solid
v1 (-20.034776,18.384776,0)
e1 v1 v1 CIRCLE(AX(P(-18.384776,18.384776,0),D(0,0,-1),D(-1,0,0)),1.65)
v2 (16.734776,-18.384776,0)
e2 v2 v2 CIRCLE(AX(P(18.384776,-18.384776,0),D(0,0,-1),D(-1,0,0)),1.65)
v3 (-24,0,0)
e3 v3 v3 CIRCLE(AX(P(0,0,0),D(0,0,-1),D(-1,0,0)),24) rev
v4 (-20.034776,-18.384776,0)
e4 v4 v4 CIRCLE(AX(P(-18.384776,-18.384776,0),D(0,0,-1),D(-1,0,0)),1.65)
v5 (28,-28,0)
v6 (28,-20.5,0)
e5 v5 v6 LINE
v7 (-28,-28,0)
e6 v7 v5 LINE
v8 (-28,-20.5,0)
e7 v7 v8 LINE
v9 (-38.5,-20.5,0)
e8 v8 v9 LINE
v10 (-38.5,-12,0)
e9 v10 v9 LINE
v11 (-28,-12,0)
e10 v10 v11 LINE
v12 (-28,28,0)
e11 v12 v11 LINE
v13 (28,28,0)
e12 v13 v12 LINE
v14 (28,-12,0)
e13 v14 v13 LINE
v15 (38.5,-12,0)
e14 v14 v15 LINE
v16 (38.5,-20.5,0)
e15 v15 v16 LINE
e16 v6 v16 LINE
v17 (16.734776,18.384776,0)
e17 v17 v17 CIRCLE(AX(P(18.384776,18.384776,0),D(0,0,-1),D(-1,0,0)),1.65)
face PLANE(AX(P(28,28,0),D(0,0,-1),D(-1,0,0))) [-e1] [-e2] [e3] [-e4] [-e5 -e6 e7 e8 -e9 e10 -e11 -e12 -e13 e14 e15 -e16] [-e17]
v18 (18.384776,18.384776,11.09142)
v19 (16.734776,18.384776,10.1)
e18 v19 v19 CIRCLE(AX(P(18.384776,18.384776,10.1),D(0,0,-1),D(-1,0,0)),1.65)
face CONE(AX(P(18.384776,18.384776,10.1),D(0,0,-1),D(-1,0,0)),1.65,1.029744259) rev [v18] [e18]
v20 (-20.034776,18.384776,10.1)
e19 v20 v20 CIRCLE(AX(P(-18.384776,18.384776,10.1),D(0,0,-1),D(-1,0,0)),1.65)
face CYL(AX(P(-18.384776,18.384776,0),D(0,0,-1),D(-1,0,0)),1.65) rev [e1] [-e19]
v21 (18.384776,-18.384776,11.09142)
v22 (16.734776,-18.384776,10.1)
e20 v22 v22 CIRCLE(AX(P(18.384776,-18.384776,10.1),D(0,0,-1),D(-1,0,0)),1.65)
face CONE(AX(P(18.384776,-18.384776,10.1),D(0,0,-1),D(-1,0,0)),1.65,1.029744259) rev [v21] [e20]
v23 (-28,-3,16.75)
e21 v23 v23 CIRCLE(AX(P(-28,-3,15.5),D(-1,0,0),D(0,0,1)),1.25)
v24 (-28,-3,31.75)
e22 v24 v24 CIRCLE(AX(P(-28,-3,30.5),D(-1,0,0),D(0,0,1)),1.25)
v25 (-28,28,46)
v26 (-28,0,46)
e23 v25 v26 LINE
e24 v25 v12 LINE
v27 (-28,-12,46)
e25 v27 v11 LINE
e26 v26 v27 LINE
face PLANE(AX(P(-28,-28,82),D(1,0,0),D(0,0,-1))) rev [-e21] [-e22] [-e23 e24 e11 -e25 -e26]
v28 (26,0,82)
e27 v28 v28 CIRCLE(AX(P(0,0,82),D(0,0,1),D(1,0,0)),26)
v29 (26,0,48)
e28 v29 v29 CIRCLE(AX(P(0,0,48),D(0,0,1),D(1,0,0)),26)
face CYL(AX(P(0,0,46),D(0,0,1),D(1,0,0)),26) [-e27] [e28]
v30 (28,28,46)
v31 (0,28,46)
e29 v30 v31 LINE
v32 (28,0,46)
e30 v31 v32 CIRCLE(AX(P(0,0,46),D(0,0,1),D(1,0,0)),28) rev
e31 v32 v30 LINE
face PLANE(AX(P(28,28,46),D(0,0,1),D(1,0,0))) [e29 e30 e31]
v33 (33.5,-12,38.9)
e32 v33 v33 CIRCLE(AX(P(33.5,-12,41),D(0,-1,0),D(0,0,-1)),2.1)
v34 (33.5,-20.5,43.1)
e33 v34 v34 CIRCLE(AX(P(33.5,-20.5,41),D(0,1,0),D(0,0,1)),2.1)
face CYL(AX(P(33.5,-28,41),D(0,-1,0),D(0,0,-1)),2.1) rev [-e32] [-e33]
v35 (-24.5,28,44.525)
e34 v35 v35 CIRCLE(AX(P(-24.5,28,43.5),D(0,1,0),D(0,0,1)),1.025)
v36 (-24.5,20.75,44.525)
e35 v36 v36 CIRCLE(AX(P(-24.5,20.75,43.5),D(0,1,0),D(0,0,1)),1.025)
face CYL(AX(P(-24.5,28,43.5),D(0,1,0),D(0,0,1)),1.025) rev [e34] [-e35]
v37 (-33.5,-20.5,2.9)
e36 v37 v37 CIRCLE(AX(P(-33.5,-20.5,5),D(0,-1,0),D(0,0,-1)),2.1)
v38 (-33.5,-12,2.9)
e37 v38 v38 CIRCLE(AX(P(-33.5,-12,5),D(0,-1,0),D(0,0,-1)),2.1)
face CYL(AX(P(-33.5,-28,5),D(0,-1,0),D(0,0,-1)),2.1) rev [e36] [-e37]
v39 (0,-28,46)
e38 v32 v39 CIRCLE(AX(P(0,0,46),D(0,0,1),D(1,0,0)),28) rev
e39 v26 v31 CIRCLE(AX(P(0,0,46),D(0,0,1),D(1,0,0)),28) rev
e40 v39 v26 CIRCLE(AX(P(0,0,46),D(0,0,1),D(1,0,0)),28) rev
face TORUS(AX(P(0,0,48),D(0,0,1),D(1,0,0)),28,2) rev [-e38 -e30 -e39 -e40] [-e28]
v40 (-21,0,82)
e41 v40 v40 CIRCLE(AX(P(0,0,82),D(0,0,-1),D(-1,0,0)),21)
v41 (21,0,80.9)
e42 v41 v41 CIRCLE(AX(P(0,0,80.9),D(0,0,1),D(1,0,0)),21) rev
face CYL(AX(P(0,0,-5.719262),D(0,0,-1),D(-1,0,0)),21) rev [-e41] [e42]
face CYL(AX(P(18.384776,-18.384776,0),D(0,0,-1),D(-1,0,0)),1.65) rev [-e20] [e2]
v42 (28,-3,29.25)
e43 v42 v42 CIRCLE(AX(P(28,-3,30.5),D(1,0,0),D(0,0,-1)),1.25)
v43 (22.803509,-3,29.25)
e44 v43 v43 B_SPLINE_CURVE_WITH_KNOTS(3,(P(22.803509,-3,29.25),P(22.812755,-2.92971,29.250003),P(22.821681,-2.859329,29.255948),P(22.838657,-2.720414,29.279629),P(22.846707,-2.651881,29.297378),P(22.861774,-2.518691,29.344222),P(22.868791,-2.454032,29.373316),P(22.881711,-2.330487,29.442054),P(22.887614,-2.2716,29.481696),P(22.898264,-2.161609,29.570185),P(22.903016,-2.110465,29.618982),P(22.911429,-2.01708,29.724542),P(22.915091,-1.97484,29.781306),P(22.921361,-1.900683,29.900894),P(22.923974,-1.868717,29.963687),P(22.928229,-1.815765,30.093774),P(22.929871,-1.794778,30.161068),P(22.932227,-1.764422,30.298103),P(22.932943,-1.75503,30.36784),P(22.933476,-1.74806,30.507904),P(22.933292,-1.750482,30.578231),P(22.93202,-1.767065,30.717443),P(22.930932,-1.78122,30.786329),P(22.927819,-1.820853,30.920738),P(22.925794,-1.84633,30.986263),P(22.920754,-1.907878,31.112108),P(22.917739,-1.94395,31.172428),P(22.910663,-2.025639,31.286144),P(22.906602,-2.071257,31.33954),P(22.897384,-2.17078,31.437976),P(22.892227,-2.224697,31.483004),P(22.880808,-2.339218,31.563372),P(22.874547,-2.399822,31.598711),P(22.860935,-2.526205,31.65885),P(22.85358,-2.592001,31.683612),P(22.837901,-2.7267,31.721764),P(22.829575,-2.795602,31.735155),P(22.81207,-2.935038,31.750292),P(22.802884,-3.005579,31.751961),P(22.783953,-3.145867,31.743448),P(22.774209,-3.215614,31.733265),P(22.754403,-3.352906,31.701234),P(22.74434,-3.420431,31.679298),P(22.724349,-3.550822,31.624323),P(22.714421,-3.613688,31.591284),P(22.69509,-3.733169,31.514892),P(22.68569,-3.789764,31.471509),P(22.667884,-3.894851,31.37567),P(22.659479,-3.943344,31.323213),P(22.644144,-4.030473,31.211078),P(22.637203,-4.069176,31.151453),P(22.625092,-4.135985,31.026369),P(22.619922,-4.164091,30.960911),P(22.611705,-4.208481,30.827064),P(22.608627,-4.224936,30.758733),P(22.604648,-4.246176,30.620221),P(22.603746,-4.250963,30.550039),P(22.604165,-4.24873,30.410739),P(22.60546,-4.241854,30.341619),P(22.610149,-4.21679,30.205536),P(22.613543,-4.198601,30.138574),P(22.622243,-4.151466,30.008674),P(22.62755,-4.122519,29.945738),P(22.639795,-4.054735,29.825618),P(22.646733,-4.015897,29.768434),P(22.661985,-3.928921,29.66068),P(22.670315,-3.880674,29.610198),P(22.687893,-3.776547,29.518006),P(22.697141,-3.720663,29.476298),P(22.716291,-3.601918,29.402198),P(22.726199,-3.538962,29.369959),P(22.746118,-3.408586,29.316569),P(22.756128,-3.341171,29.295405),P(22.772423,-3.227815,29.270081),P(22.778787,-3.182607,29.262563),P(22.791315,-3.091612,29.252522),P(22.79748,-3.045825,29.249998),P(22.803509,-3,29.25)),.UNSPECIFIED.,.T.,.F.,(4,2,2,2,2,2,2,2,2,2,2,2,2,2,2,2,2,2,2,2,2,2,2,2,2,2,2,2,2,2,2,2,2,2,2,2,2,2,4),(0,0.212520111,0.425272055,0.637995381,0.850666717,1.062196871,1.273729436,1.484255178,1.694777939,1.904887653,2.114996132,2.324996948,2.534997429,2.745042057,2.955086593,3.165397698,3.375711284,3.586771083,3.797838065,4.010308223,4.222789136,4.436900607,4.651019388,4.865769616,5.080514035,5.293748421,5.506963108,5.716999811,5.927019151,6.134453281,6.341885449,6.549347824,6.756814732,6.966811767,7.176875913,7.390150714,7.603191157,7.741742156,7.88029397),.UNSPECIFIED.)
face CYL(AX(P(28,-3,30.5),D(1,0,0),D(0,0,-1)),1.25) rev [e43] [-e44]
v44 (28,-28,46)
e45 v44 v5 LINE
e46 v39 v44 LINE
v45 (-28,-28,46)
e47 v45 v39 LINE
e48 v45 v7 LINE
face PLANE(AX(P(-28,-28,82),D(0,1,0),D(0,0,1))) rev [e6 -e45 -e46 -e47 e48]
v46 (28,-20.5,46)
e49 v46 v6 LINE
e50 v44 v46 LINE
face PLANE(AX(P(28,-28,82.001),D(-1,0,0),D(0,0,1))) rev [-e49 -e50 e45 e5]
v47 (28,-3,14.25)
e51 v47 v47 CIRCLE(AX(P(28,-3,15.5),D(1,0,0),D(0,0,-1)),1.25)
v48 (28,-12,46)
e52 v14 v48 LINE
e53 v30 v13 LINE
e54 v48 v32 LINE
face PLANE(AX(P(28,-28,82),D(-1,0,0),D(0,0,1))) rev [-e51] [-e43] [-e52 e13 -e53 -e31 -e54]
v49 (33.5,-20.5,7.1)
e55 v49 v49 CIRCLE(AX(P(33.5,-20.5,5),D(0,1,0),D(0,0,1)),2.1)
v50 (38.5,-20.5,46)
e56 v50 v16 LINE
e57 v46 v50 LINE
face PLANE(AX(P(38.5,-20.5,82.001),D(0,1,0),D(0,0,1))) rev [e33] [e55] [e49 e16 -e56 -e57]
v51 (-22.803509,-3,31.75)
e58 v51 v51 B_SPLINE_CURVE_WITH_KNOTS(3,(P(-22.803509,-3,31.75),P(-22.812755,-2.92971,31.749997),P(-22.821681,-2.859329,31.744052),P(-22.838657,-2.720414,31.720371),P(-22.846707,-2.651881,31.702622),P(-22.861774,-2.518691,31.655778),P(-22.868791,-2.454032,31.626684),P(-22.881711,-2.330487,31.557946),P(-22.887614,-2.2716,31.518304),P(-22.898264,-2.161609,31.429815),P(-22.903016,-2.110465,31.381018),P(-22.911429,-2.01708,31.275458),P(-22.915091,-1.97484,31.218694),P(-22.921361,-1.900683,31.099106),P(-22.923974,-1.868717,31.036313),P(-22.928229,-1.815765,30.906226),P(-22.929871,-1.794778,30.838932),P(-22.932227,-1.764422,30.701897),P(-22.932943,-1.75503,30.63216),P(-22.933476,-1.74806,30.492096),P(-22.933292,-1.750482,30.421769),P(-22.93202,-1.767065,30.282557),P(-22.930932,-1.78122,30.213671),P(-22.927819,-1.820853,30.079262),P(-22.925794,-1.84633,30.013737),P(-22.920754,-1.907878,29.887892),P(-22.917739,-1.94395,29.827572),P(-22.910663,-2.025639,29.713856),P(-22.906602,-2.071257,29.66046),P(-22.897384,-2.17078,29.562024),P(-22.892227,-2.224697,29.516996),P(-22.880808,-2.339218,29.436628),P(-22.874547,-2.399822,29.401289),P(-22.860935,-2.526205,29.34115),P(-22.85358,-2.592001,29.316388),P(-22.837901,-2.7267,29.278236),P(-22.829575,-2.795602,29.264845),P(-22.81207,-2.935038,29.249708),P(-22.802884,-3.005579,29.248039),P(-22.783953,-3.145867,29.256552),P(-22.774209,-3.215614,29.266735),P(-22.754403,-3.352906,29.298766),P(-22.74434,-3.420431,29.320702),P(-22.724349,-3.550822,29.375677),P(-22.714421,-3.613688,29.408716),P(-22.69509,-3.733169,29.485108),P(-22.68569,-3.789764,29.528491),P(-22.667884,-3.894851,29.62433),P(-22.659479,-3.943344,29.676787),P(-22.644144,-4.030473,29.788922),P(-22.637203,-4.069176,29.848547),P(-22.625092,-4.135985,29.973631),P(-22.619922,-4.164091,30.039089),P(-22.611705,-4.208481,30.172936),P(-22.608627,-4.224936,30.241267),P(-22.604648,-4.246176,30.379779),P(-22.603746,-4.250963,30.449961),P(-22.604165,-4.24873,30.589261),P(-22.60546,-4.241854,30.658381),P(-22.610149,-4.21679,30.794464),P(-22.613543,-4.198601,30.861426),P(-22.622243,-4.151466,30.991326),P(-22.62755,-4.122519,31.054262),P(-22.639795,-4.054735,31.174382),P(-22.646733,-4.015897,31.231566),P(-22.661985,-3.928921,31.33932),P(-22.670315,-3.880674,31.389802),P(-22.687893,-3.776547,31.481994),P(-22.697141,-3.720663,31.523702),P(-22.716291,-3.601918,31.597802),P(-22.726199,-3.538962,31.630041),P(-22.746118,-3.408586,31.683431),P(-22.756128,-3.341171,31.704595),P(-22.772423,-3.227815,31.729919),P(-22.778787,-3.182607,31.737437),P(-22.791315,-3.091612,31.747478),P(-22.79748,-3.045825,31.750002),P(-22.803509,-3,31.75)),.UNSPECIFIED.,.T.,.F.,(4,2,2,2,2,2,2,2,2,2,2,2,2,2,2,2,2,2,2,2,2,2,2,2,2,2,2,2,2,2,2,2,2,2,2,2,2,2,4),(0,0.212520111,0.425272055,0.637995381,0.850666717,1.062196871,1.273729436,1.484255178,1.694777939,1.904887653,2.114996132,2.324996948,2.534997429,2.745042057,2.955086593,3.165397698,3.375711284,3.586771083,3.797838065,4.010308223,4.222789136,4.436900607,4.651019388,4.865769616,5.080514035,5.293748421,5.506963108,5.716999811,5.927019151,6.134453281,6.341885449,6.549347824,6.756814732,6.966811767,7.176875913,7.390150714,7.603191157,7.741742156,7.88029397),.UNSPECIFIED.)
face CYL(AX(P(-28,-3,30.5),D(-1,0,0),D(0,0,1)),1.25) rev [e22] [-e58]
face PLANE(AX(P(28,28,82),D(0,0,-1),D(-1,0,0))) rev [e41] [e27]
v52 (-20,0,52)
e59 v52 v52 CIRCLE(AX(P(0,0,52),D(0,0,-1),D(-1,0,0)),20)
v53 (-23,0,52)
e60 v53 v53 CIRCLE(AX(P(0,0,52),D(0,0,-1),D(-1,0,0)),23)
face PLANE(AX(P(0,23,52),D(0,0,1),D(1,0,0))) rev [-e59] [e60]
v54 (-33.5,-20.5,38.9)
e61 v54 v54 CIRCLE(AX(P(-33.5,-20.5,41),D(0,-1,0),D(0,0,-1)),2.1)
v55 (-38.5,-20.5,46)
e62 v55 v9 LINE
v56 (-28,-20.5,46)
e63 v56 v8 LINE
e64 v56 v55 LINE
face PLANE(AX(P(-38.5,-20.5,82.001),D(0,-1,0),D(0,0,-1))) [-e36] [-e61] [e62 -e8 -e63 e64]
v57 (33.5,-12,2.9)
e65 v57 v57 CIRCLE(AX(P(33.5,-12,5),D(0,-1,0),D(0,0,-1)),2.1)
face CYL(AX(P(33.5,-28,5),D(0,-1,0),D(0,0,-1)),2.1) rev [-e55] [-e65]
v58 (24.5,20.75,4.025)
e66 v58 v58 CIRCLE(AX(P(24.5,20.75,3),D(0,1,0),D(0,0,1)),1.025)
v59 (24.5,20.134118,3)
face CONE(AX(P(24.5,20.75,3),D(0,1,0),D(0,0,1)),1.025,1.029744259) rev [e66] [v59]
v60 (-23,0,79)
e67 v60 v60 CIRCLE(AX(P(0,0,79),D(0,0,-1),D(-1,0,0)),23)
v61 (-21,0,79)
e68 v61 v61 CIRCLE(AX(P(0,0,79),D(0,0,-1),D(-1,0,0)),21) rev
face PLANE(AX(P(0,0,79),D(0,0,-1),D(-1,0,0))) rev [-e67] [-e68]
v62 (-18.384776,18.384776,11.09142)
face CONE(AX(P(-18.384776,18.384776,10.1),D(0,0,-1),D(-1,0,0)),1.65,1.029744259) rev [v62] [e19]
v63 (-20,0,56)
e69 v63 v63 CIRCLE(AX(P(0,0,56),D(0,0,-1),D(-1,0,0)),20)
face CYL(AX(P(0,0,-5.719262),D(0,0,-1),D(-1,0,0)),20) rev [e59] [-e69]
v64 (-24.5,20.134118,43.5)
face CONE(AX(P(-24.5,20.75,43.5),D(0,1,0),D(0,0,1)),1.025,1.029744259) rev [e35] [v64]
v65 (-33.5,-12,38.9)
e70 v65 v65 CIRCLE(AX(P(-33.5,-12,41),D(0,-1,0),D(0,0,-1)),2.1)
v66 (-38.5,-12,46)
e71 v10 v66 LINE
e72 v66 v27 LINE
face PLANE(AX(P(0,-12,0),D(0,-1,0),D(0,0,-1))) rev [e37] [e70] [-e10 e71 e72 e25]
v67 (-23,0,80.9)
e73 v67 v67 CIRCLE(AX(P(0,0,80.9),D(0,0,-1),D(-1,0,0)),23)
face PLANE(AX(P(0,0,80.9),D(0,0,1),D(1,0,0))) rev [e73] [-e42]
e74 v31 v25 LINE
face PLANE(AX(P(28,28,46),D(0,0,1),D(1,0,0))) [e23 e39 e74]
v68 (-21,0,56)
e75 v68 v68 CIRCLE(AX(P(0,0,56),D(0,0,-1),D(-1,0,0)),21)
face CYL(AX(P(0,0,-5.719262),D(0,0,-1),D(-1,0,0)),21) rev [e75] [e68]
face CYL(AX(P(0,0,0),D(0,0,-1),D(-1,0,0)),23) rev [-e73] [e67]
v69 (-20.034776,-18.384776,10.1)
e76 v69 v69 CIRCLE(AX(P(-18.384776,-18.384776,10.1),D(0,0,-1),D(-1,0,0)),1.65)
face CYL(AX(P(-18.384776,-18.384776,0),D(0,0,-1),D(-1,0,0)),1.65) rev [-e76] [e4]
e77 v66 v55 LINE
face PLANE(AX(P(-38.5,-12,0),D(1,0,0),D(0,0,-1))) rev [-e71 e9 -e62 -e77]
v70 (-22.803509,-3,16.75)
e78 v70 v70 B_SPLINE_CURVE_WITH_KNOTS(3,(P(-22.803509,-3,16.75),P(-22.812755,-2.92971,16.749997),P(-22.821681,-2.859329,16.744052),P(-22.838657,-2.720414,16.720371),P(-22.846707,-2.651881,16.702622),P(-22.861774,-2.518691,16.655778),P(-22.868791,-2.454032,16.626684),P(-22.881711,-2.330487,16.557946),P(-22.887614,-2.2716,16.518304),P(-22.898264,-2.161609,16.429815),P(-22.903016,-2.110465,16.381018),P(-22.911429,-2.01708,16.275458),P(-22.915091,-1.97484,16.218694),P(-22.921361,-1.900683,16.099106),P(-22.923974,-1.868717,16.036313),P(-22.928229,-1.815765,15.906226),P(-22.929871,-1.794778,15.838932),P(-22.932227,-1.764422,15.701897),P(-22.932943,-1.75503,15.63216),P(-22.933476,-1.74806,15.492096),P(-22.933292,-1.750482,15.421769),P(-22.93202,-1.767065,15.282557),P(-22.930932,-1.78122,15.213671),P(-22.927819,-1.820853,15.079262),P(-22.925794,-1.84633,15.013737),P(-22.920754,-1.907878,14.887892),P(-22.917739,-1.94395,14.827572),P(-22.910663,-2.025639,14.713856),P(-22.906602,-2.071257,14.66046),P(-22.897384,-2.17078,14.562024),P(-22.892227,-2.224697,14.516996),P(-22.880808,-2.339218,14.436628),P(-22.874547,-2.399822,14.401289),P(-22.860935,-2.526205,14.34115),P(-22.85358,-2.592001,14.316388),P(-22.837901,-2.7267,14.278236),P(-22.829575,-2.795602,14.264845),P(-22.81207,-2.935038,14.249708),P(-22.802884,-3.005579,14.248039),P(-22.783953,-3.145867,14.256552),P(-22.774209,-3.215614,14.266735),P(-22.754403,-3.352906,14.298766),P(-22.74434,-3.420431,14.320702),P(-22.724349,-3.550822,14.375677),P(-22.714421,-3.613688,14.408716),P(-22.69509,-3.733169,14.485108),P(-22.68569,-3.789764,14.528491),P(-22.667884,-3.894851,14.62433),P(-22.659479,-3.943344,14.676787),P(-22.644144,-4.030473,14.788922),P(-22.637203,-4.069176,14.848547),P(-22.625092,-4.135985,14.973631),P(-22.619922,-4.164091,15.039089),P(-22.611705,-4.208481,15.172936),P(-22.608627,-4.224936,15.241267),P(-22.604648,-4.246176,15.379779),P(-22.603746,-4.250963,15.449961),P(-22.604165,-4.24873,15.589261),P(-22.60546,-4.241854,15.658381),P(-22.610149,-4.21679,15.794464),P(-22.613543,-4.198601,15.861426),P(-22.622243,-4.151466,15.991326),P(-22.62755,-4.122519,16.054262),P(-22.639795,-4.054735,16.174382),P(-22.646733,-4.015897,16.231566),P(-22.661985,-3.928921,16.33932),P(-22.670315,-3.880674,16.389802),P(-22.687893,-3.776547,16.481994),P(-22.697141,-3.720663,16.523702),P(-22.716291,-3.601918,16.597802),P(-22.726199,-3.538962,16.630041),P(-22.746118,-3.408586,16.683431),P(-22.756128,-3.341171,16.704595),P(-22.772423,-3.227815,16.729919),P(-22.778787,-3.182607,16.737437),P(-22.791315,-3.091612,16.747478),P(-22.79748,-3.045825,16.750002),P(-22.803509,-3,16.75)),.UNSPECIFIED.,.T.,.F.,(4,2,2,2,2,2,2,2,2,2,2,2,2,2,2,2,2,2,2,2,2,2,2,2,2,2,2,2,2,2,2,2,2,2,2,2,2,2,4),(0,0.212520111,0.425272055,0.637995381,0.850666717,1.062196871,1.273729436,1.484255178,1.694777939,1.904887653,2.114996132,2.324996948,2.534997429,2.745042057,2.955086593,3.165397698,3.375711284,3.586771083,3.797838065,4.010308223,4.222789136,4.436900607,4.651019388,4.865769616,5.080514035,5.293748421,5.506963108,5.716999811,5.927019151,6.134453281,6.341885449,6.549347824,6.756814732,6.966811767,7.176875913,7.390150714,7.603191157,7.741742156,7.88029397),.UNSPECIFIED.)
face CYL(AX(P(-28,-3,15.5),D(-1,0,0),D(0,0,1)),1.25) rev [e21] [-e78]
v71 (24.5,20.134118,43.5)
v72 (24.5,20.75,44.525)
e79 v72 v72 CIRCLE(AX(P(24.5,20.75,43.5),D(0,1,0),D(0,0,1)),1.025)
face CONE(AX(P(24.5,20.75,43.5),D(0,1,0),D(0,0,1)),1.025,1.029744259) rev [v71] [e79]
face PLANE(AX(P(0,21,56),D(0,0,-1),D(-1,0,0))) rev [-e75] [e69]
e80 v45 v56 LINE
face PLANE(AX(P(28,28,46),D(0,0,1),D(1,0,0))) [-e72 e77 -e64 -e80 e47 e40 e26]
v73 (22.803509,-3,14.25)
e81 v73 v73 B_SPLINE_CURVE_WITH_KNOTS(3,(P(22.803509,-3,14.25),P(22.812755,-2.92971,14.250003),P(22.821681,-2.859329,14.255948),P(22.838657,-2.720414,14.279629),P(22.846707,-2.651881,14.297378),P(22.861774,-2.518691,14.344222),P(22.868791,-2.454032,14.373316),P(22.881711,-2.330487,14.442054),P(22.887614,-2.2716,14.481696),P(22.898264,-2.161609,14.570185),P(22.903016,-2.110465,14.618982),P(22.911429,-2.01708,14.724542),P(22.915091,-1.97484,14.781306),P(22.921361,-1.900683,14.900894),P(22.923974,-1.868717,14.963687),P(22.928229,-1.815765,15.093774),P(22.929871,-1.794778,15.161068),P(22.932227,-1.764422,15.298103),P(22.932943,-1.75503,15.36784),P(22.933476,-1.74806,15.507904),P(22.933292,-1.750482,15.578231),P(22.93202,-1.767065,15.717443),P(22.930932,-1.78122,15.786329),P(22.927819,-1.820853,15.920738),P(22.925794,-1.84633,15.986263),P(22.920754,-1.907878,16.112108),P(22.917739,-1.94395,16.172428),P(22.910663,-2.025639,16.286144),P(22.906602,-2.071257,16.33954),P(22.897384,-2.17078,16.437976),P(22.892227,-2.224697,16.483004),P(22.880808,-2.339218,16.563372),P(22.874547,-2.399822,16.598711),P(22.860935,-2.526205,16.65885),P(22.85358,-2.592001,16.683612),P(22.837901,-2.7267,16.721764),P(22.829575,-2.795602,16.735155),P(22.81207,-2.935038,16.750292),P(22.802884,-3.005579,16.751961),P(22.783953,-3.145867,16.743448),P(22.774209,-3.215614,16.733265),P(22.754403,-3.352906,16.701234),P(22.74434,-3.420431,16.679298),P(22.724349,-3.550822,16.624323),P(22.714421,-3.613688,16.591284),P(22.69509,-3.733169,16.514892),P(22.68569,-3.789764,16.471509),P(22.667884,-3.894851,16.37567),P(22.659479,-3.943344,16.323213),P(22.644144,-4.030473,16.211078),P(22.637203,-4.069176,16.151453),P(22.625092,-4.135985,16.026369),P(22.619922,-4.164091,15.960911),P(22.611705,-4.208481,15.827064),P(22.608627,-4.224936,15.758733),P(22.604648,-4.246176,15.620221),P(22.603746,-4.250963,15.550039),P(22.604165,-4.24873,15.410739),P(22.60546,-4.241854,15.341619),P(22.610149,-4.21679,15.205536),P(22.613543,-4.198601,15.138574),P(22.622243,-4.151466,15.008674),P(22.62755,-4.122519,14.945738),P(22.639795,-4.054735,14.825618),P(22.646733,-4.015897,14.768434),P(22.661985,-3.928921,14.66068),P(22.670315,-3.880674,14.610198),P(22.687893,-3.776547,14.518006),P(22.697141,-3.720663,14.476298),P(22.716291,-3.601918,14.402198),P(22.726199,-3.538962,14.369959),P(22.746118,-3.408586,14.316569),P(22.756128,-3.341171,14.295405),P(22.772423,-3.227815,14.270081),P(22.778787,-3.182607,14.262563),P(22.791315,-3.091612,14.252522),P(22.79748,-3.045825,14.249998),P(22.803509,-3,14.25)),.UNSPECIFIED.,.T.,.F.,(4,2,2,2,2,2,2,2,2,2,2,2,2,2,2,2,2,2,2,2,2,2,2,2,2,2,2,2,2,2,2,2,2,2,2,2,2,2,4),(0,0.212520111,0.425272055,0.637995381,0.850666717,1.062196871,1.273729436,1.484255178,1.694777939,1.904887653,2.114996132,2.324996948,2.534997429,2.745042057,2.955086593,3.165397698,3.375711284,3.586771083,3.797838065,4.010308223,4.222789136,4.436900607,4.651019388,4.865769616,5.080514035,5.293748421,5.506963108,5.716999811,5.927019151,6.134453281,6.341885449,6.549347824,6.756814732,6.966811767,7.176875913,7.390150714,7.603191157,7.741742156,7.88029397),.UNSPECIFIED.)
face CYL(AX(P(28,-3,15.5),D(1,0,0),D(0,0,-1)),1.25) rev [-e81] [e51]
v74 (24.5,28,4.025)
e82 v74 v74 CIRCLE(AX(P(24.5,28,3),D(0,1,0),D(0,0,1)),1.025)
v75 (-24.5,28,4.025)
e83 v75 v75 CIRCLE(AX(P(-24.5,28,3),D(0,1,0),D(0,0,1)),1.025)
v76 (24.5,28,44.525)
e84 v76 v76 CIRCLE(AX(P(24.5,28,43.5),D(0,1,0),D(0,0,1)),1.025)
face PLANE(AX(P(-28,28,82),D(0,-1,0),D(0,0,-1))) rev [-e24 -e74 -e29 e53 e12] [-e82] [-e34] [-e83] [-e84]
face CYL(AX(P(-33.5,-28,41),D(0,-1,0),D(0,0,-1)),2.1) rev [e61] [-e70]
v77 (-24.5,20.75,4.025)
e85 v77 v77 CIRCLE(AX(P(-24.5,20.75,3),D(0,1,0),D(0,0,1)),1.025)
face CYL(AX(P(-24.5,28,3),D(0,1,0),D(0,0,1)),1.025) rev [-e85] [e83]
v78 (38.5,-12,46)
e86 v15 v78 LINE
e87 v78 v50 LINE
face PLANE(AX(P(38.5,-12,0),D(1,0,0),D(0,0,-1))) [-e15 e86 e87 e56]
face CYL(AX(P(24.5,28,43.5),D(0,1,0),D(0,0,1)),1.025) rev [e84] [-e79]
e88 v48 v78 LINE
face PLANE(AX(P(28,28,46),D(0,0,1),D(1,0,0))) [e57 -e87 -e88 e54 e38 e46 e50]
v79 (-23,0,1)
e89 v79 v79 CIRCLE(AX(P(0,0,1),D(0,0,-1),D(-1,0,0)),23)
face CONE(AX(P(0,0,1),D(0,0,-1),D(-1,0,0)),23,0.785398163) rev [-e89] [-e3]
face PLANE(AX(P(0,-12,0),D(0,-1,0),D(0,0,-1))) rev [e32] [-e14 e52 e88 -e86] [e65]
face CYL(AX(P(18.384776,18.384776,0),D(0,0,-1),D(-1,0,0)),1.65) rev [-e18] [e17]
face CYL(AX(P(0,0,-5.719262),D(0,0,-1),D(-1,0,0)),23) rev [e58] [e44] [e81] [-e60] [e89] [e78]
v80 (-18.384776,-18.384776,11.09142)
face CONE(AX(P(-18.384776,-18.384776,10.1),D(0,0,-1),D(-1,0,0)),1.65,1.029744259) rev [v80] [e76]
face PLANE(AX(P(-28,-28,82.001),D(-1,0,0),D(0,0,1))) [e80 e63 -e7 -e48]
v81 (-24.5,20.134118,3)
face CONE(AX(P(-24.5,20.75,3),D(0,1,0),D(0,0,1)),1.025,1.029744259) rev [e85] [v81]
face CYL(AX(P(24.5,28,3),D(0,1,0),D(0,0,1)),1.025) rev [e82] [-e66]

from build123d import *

# Parameters (mm, degrees)
SKETCH_1_W                  = 56
SKETCH_1_H                  = 56
EXTRUDE_1_DEPTH             = 82
SKETCH_4_W                  = 56
SKETCH_4_H                  = 56
SKETCH_4_R                  = 26
CUT_EXTRUDE_1_DEPTH         = 36
HOLE_WIZARD_M4_1_D          = 3.3
HOLE_WIZARD_M4_1_DEPTH      = 10.1
HOLE_WIZARD_M4_1_TIP        = 0.991420021
SKETCH_15_W                 = 23
SKETCH_15_H                 = 1.9
FILLET_1_R                  = 2
CHAMFER_2_SIZE              = 1
HOLE_WIZARD_M2_5_1_D        = 2.05
HOLE_WIZARD_M2_5_1_DEPTH    = 7.25
HOLE_WIZARD_M2_5_1_TIP      = 0.615882135
SKETCH_19_W                 = 10.5
SKETCH_19_H                 = 46
EXTRUDE_2_DEPTH             = 16
HOLE_WIZARD_M5_1_D          = 4.2
HOLE_WIZARD_M3_1_AT_2_COUNT = 2
HOLE_WIZARD_M3_1_AT_2_PITCH = 15
CUT_EXTRUDE_2_REACH         = 96.817
SKETCH_25_W                 = 10.5
SKETCH_25_H                 = 7.5


with BuildPart() as part:
    # 草图1 → 凸台-拉伸1 (new body)
    with BuildSketch(Plane.XY):
        Rectangle(SKETCH_1_W, SKETCH_1_H)
    extrude(amount=EXTRUDE_1_DEPTH)

    # 草图3 → 切除-旋转2 (revolve, cut)
    with BuildSketch(Plane(origin=(0, 0, 0), x_dir=(0, 0, -1), z_dir=(1, 0, 0)), mode=Mode.PRIVATE) as cut_revolve_2_sk:
        Polygon((-82, 0), (0, 0), (0, 23), (-52, 23), (-52, 20), (-56, 20), (-56, 21), (-82, 21), align=None)
    revolve(cut_revolve_2_sk.sketch.rotate(Axis((0, 0, -5.719261836), (0, 0, 1)), 90), axis=Axis((0, 0, -5.719261836), (0, 0, 1)), mode=Mode.SUBTRACT)

    # 草图4 → 切除-拉伸1 (cut)
    with BuildSketch(Plane.XY.offset(82)):
        Rectangle(SKETCH_4_W, SKETCH_4_H)
        Circle(SKETCH_4_R, mode=Mode.SUBTRACT)
    extrude(amount=-CUT_EXTRUDE_1_DEPTH, mode=Mode.SUBTRACT)

    # M4 螺纹孔1
    with Locations(Plane(origin=(0, 0, 0), x_dir=(-1, 0, 0), z_dir=(0, 0, -1))):
        with Locations((18.384776311, 18.384776311), (18.384776311, -18.384776311), (-18.384776311, -18.384776311), (-18.384776311, 18.384776311)):
            Hole(HOLE_WIZARD_M4_1_D / 2, depth=HOLE_WIZARD_M4_1_DEPTH)
            with Locations((0, 0, -(HOLE_WIZARD_M4_1_DEPTH + HOLE_WIZARD_M4_1_TIP / 2))):  # 118° drill point
                Cone(0, HOLE_WIZARD_M4_1_D / 2, HOLE_WIZARD_M4_1_TIP, mode=Mode.SUBTRACT)

    # 草图15 → 切除-旋转3 (revolve, cut)
    with BuildSketch(Plane(origin=(0, 0, 0), x_dir=(1, 0, 0), z_dir=(0, 1, 0))):
        with Locations((-11.5, -79.95)):
            Rectangle(SKETCH_15_W, SKETCH_15_H)
    revolve(axis=Axis((0, 0, 0), (0, 0, 1)), mode=Mode.SUBTRACT)

    # 圆角1
    fillet_1_edges = [part.edges().sort_by_distance(p)[0] for p in [
        (-26, 0, 46),
    ]]
    fillet(fillet_1_edges, radius=FILLET_1_R - 0.0001)  # a hair under: the kernel refuses the full size

    # 倒角2
    chamfer_2_edges = [part.edges().sort_by_distance(p)[0] for p in [
        (23, 0, 0),
    ]]
    chamfer(chamfer_2_edges, length=CHAMFER_2_SIZE)

    # M2.5 螺纹孔1
    with Locations(Plane(origin=(0, 28, 0), x_dir=(1, 0, 0), z_dir=(0, 1, 0))):
        with Locations((24.5, -3), (-24.5, -43.5), (-24.5, -3), (24.5, -43.5)):
            Hole(HOLE_WIZARD_M2_5_1_D / 2, depth=HOLE_WIZARD_M2_5_1_DEPTH)
            with Locations((0, 0, -(HOLE_WIZARD_M2_5_1_DEPTH + HOLE_WIZARD_M2_5_1_TIP / 2))):  # 118° drill point
                Cone(0, HOLE_WIZARD_M2_5_1_D / 2, HOLE_WIZARD_M2_5_1_TIP, mode=Mode.SUBTRACT)

    # 草图19 → 凸台-拉伸2 (add)
    with BuildSketch(Plane.XZ.offset(28)):
        with Locations((33.25, 23)):
            Rectangle(SKETCH_19_W, SKETCH_19_H)
        with Locations((-33.25, 23)):
            Rectangle(SKETCH_19_W, SKETCH_19_H)
    extrude(amount=-EXTRUDE_2_DEPTH)

    # M5 螺纹孔1 (through all)
    with Locations(Plane(origin=(0, -28, 0), x_dir=(-1, 0, 0), z_dir=(0, -1, 0))):
        with Locations((33.5, -5), (-33.5, -41), (-33.5, -5), (33.5, -41)):
            Hole(HOLE_WIZARD_M5_1_D / 2)

    # 草图24 → M3 螺纹孔1 (revolve, cut)
    with BuildSketch(Plane(origin=(28, -3, 30.5), x_dir=(0, 0, -1), z_dir=(0, 1, 0))):
        Polygon((0, 0), (0, 6.251075774), (1.25, 5.5), (1.25, 0), align=None)
    hole_wizard_m3_1 = revolve(axis=Axis((34.35, -3, 30.5), (-1, 0, 0)), mode=Mode.SUBTRACT)

    # M3 螺纹孔1 at 2: M3 螺纹孔1 ×2
    with Locations(*[(0, 0, -i * HOLE_WIZARD_M3_1_AT_2_PITCH) for i in range(1, HOLE_WIZARD_M3_1_AT_2_COUNT)]):
        add(hole_wizard_m3_1, mode=Mode.SUBTRACT)

    # 草图25 → 切除-拉伸2 (cut, up to next)
    with BuildSketch(Plane(origin=(0, 0, 0), x_dir=(-1, 0, 0), z_dir=(0, 0, -1)), mode=Mode.PRIVATE) as cut_extrude_2_sk1:
        with Locations((-33.25, -24.25)):
            Rectangle(SKETCH_25_W, SKETCH_25_H)
    cut_extrude_2_tool1 = extrude(cut_extrude_2_sk1.sketch, amount=-CUT_EXTRUDE_2_REACH, mode=Mode.PRIVATE) & part.part
    cut_extrude_2 = cut_extrude_2_tool1.solids().sort_by_distance((33.25, -24.25, 0))[0]
    add(cut_extrude_2, mode=Mode.SUBTRACT)

    # 镜向1: M3 螺纹孔1, 切除-拉伸2 across plane
    add(hole_wizard_m3_1.mirror(Plane(origin=(0, 0, 0), x_dir=(0, 0, 1), z_dir=(1, 0, 0))), mode=Mode.SUBTRACT)
    add(cut_extrude_2.mirror(Plane(origin=(0, 0, 0), x_dir=(0, 0, 1), z_dir=(1, 0, 0))), mode=Mode.SUBTRACT)

    # 镜向1 copy 1 sketch → 镜向1 copy 1 (revolve, cut)
    with BuildSketch(Plane(origin=(-28, -3, 15.5), x_dir=(0, 0, -1), z_dir=(0, 1, 0))):
        Polygon((0, 0), (0, -6.251075774), (1.25, -5.5), (1.25, 0), align=None)
    revolve(axis=Axis((-34.35, -3, 15.5), (-1, 0, 0)), mode=Mode.SUBTRACT)


solid = part.part
